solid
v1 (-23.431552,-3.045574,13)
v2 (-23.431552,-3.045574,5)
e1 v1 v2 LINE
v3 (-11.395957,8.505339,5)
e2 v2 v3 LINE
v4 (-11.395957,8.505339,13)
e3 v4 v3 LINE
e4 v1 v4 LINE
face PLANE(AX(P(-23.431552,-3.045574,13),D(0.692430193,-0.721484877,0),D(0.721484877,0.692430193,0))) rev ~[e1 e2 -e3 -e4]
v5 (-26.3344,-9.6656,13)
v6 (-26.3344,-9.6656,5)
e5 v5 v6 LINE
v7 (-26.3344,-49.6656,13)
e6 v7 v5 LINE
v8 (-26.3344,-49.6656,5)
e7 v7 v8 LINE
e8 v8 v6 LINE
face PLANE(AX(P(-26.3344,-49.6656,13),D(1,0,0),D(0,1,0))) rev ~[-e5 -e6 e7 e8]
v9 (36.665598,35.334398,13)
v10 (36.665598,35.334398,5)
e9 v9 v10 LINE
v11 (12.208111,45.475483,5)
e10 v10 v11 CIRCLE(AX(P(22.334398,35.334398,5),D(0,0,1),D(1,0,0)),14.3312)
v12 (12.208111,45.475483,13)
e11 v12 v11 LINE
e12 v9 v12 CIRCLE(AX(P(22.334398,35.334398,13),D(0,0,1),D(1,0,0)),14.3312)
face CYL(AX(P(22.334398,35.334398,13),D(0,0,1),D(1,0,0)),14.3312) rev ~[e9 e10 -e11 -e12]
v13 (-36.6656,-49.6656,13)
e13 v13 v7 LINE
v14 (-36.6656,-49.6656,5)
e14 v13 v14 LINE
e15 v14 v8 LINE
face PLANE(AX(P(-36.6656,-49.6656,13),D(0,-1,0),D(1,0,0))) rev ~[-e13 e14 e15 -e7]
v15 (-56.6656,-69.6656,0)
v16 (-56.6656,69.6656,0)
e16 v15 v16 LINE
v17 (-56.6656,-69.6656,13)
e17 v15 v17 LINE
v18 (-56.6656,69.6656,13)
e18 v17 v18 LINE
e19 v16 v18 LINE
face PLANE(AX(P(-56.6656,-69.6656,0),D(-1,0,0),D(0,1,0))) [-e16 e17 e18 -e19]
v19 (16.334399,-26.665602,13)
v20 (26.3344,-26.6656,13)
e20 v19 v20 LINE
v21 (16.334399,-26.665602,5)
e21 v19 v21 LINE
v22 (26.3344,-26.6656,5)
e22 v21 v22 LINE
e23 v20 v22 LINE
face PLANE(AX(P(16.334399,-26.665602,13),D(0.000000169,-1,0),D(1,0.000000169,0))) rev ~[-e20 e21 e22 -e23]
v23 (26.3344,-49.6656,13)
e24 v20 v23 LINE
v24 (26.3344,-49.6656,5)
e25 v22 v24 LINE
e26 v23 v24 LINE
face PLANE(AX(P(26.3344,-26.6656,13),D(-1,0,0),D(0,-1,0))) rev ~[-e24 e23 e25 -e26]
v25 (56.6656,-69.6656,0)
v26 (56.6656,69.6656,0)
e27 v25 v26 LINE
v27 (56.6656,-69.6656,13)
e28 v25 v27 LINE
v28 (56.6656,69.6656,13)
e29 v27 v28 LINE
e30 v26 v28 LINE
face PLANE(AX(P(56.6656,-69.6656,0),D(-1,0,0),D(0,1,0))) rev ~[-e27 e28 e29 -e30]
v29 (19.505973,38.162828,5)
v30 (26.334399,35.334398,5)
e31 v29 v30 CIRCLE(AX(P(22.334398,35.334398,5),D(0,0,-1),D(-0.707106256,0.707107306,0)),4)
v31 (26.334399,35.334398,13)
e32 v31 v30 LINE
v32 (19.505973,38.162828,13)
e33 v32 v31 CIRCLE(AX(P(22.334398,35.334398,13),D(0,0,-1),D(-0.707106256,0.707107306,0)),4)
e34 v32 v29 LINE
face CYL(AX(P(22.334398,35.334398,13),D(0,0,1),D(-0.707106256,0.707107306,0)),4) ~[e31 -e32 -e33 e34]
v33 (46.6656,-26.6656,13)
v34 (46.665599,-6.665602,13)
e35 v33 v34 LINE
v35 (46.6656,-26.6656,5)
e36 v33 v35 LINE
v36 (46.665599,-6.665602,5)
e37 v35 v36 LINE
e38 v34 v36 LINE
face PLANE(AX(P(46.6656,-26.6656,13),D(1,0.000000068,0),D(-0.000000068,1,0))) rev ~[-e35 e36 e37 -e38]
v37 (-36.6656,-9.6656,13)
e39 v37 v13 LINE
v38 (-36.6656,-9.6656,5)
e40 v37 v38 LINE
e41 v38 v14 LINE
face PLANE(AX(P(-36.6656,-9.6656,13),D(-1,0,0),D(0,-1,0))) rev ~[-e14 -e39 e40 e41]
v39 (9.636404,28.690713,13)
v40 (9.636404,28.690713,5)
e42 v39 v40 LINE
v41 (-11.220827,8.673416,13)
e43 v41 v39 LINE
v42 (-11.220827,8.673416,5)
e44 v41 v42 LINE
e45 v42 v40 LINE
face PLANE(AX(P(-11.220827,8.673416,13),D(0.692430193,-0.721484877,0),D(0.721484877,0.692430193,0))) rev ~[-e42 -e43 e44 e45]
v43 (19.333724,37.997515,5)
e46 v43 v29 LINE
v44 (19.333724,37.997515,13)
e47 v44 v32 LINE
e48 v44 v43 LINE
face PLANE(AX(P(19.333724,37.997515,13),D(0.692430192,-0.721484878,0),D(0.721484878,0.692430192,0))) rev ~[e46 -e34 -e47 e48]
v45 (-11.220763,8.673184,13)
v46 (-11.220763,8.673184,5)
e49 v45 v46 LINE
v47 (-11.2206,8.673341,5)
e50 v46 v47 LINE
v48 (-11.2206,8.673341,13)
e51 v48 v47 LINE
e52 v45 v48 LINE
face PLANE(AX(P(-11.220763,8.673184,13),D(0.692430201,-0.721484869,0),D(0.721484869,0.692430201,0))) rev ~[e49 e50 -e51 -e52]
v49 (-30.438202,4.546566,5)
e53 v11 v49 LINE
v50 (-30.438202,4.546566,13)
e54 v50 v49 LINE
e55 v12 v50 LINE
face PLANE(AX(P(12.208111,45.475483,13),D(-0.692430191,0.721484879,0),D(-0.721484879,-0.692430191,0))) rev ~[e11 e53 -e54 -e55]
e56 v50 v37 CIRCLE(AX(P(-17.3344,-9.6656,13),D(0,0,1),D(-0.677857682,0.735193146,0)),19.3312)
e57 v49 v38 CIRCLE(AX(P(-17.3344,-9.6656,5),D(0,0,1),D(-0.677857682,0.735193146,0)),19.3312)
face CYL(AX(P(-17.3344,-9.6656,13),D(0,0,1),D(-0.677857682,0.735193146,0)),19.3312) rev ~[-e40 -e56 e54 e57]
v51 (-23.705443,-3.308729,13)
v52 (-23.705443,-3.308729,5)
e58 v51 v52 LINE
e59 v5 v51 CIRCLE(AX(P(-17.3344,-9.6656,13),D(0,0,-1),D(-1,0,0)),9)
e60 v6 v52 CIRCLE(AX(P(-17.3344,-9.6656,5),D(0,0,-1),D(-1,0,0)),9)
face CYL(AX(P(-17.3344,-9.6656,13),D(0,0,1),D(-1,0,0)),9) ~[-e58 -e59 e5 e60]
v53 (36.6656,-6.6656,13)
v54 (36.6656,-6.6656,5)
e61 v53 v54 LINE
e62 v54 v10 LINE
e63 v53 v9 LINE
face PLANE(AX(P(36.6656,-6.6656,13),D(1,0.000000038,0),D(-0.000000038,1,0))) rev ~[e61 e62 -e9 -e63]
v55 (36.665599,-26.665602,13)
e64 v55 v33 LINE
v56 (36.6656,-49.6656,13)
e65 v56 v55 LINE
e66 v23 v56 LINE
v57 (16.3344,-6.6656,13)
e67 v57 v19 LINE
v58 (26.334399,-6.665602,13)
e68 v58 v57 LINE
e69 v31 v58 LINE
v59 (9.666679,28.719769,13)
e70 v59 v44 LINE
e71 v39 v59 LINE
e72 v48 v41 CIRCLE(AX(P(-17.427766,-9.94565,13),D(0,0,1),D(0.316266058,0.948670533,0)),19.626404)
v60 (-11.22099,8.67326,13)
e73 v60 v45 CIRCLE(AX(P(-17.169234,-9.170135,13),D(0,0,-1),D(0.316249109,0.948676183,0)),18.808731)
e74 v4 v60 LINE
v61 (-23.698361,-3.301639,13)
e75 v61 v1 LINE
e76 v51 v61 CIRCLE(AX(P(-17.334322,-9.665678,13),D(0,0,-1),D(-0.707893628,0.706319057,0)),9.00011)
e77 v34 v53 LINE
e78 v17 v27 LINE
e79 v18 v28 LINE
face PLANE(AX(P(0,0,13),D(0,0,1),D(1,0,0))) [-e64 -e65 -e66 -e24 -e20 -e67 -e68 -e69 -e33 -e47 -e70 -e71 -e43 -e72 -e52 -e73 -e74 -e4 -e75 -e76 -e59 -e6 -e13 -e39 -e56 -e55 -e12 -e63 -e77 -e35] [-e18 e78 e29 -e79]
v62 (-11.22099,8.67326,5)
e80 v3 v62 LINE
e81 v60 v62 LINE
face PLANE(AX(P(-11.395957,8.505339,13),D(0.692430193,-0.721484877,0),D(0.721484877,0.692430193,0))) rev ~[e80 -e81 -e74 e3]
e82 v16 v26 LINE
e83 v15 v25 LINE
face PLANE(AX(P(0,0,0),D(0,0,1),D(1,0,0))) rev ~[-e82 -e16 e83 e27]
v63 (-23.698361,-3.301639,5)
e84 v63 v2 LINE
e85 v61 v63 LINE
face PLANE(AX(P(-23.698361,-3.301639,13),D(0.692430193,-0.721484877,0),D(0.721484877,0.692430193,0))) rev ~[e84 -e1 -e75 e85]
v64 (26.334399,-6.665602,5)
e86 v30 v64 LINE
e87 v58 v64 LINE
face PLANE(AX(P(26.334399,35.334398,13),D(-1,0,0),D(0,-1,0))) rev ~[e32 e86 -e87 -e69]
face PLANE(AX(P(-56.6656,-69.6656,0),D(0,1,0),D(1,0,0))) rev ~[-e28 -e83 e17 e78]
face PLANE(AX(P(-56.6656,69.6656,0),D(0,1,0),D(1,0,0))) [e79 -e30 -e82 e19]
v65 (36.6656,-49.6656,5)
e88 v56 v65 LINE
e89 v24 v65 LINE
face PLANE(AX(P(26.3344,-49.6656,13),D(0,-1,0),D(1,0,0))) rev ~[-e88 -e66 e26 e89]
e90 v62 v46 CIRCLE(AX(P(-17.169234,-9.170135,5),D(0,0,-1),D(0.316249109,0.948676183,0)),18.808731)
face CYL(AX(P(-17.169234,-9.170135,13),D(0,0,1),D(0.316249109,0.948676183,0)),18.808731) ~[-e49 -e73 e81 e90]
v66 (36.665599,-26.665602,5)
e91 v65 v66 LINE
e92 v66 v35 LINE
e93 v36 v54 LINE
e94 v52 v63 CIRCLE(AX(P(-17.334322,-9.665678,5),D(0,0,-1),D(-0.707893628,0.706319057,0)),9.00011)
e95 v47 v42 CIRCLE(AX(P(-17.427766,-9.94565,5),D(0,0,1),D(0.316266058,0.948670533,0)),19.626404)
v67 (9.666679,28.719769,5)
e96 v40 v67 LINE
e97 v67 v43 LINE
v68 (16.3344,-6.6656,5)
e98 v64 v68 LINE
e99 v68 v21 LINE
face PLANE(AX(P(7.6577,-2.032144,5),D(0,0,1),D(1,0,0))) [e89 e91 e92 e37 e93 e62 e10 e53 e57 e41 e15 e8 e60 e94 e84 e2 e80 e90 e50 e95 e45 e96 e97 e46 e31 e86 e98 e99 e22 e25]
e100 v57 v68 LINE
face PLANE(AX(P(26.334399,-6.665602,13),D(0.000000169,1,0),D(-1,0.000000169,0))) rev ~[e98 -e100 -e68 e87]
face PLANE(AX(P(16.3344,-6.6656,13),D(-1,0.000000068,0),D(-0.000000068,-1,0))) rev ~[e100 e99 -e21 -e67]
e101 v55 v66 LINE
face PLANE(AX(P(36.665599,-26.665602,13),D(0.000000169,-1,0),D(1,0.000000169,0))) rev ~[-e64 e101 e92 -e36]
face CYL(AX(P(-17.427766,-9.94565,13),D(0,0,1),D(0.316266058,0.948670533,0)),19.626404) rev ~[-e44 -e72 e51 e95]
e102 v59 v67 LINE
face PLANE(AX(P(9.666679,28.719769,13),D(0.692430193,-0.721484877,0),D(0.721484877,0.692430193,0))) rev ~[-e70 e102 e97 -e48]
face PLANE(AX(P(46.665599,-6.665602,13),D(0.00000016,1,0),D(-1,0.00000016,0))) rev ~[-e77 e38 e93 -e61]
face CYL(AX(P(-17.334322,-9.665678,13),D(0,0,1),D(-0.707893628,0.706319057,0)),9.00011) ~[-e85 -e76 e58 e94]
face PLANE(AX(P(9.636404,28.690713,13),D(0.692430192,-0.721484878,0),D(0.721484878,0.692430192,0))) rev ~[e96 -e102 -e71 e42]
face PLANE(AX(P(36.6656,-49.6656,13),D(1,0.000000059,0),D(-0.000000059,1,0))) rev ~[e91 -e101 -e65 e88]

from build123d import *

# Parameters (mm, degrees)
F0_W     = 113.3312
F0_H     = 139.3312
F1_DEPTH = 13
F3_DEPTH = 8


# Not quite as in the source:
# - ends of sketch curves that miss each other by under 0.0002 mm in the source are joined


with BuildPart() as f1:
    # F0 (on Top) → F1 (new body)
    with BuildSketch(Plane.XY):
        Rectangle(F0_W, F0_H)
    extrude(amount=F1_DEPTH)

    # F2 (on face) → F3 (cut)
    with BuildSketch(Plane.XY.offset(13)):
        with BuildLine():
            Line((26.3344, -49.6656), (36.6656, -49.6656))
            Line((36.6656, -49.6656), (36.665598632, -26.6656016949))
            Line((36.665598632, -26.6656016949), (46.6656, -26.6656))
            Line((46.6656, -26.6656), (46.665598632, -6.6656015976))
            Line((46.665598632, -6.6656015976), (36.6656, -6.6656))
            Line((36.6656, -6.6656), (36.6655984, 35.3343984024))
            ThreePointArc((36.6655984, 35.3343984024), (27.823544274, 48.5726978027), (12.2081110977, 45.4754831032))
            Line((12.2081110977, 45.4754831032), (-30.4382024275, 4.5465657527))
            ThreePointArc((-30.4382024275, 4.5465657527), (-35.0404373732, -1.9072796936), (-36.6656, -9.6656))
            Line((-36.6656, -9.6656), (-36.6656, -16.6656))
            Line((-36.6656, -16.6656), (-36.6656, -49.6656))
            Line((-36.6656, -49.6656), (-26.3344000004, -49.6656))
            Line((-26.3344000004, -49.6656), (-26.3344000004, -16.6656))
            Line((-26.3344000004, -16.6656), (-26.3344000004, -9.6656))
            ThreePointArc((-26.3344000004, -9.6656), (-25.6512318575, -6.2260785418), (-23.7054426981, -3.3087285252))
            ThreePointArc((-23.7054426981, -3.3087285252), (-23.7019028512, -3.3051827615), (-23.6983610309, -3.3016389689))
            ThreePointArc((-23.6983610309, -3.3016389689), (-23.566271734, -3.172236103), (-23.4315517652, -3.0455742931))
            Line((-23.4315517652, -3.0455742931), (-11.3959568303, 8.5053390806))
            Line((-11.3959568303, 8.5053390806), (-11.220990014, 8.6732598648))
            Line((-11.220990014, 8.6732598648), (-11.2208270158, 8.6734162989))
            Line((-11.2208270158, 8.6734162989), (9.6364044846, 28.6907129577))
            Line((9.6364044846, 28.6907129577), (9.6666794098, 28.7197686911))
            Line((9.6666794098, 28.7197686911), (19.3337239366, 37.9975147862))
            Line((19.3337239366, 37.9975147862), (19.5059733761, 38.162827624))
            ThreePointArc((19.5059733761, 38.162827624), (23.8651336494, 39.0299159917), (26.334398632, 35.3343983051))
            Line((26.334398632, 35.3343983051), (26.334398632, -6.6656016949))
            Line((26.334398632, -6.6656016949), (16.3344, -6.6656))
            Line((16.3344, -6.6656), (16.334398632, -26.6656016949))
            Line((16.334398632, -26.6656016949), (26.3344, -26.6656))
            Line((26.3344, -26.6656), (26.3344, -49.6656))
        make_face()
        with BuildLine():
            ThreePointArc((-30.988946, 4.018001), (-30.7197680452, 4.2814242377), (-30.4455091202, 4.5395533054))
            Line((-30.4455091202, 4.5395533054), (-30.988946, 4.018001))
        make_face(mode=Mode.SUBTRACT)
        with BuildLine():
            Line((-30.988946, 4.018001), (-30.4455091202, 4.5395533054))
            ThreePointArc((-30.4455091202, 4.5395533054), (-30.7197680452, 4.2814242377), (-30.988946, 4.018001))
        make_face()
        with BuildLine():
            Line((-23.6983610309, -3.3016389689), (-23.4315517652, -3.0455742931))
            ThreePointArc((-23.4315517652, -3.0455742931), (-23.566271734, -3.172236103), (-23.6983610309, -3.3016389689))
        make_face()
        with BuildLine():
            ThreePointArc((-11.2206003272, 8.6733407274), (-11.2207136714, 8.6733785135), (-11.2208270158, 8.6734162989))
            Line((-11.2208270158, 8.6734162989), (-11.220990014, 8.6732598648))
            ThreePointArc((-11.220990014, 8.6732598648), (-11.220876669, 8.6732220799), (-11.2207633243, 8.6731842943))
            Line((-11.2207633243, 8.6731842943), (-11.2206003272, 8.6733407274))
        make_face()
    extrude(amount=-F3_DEPTH, mode=Mode.SUBTRACT)


solid = f1.part
